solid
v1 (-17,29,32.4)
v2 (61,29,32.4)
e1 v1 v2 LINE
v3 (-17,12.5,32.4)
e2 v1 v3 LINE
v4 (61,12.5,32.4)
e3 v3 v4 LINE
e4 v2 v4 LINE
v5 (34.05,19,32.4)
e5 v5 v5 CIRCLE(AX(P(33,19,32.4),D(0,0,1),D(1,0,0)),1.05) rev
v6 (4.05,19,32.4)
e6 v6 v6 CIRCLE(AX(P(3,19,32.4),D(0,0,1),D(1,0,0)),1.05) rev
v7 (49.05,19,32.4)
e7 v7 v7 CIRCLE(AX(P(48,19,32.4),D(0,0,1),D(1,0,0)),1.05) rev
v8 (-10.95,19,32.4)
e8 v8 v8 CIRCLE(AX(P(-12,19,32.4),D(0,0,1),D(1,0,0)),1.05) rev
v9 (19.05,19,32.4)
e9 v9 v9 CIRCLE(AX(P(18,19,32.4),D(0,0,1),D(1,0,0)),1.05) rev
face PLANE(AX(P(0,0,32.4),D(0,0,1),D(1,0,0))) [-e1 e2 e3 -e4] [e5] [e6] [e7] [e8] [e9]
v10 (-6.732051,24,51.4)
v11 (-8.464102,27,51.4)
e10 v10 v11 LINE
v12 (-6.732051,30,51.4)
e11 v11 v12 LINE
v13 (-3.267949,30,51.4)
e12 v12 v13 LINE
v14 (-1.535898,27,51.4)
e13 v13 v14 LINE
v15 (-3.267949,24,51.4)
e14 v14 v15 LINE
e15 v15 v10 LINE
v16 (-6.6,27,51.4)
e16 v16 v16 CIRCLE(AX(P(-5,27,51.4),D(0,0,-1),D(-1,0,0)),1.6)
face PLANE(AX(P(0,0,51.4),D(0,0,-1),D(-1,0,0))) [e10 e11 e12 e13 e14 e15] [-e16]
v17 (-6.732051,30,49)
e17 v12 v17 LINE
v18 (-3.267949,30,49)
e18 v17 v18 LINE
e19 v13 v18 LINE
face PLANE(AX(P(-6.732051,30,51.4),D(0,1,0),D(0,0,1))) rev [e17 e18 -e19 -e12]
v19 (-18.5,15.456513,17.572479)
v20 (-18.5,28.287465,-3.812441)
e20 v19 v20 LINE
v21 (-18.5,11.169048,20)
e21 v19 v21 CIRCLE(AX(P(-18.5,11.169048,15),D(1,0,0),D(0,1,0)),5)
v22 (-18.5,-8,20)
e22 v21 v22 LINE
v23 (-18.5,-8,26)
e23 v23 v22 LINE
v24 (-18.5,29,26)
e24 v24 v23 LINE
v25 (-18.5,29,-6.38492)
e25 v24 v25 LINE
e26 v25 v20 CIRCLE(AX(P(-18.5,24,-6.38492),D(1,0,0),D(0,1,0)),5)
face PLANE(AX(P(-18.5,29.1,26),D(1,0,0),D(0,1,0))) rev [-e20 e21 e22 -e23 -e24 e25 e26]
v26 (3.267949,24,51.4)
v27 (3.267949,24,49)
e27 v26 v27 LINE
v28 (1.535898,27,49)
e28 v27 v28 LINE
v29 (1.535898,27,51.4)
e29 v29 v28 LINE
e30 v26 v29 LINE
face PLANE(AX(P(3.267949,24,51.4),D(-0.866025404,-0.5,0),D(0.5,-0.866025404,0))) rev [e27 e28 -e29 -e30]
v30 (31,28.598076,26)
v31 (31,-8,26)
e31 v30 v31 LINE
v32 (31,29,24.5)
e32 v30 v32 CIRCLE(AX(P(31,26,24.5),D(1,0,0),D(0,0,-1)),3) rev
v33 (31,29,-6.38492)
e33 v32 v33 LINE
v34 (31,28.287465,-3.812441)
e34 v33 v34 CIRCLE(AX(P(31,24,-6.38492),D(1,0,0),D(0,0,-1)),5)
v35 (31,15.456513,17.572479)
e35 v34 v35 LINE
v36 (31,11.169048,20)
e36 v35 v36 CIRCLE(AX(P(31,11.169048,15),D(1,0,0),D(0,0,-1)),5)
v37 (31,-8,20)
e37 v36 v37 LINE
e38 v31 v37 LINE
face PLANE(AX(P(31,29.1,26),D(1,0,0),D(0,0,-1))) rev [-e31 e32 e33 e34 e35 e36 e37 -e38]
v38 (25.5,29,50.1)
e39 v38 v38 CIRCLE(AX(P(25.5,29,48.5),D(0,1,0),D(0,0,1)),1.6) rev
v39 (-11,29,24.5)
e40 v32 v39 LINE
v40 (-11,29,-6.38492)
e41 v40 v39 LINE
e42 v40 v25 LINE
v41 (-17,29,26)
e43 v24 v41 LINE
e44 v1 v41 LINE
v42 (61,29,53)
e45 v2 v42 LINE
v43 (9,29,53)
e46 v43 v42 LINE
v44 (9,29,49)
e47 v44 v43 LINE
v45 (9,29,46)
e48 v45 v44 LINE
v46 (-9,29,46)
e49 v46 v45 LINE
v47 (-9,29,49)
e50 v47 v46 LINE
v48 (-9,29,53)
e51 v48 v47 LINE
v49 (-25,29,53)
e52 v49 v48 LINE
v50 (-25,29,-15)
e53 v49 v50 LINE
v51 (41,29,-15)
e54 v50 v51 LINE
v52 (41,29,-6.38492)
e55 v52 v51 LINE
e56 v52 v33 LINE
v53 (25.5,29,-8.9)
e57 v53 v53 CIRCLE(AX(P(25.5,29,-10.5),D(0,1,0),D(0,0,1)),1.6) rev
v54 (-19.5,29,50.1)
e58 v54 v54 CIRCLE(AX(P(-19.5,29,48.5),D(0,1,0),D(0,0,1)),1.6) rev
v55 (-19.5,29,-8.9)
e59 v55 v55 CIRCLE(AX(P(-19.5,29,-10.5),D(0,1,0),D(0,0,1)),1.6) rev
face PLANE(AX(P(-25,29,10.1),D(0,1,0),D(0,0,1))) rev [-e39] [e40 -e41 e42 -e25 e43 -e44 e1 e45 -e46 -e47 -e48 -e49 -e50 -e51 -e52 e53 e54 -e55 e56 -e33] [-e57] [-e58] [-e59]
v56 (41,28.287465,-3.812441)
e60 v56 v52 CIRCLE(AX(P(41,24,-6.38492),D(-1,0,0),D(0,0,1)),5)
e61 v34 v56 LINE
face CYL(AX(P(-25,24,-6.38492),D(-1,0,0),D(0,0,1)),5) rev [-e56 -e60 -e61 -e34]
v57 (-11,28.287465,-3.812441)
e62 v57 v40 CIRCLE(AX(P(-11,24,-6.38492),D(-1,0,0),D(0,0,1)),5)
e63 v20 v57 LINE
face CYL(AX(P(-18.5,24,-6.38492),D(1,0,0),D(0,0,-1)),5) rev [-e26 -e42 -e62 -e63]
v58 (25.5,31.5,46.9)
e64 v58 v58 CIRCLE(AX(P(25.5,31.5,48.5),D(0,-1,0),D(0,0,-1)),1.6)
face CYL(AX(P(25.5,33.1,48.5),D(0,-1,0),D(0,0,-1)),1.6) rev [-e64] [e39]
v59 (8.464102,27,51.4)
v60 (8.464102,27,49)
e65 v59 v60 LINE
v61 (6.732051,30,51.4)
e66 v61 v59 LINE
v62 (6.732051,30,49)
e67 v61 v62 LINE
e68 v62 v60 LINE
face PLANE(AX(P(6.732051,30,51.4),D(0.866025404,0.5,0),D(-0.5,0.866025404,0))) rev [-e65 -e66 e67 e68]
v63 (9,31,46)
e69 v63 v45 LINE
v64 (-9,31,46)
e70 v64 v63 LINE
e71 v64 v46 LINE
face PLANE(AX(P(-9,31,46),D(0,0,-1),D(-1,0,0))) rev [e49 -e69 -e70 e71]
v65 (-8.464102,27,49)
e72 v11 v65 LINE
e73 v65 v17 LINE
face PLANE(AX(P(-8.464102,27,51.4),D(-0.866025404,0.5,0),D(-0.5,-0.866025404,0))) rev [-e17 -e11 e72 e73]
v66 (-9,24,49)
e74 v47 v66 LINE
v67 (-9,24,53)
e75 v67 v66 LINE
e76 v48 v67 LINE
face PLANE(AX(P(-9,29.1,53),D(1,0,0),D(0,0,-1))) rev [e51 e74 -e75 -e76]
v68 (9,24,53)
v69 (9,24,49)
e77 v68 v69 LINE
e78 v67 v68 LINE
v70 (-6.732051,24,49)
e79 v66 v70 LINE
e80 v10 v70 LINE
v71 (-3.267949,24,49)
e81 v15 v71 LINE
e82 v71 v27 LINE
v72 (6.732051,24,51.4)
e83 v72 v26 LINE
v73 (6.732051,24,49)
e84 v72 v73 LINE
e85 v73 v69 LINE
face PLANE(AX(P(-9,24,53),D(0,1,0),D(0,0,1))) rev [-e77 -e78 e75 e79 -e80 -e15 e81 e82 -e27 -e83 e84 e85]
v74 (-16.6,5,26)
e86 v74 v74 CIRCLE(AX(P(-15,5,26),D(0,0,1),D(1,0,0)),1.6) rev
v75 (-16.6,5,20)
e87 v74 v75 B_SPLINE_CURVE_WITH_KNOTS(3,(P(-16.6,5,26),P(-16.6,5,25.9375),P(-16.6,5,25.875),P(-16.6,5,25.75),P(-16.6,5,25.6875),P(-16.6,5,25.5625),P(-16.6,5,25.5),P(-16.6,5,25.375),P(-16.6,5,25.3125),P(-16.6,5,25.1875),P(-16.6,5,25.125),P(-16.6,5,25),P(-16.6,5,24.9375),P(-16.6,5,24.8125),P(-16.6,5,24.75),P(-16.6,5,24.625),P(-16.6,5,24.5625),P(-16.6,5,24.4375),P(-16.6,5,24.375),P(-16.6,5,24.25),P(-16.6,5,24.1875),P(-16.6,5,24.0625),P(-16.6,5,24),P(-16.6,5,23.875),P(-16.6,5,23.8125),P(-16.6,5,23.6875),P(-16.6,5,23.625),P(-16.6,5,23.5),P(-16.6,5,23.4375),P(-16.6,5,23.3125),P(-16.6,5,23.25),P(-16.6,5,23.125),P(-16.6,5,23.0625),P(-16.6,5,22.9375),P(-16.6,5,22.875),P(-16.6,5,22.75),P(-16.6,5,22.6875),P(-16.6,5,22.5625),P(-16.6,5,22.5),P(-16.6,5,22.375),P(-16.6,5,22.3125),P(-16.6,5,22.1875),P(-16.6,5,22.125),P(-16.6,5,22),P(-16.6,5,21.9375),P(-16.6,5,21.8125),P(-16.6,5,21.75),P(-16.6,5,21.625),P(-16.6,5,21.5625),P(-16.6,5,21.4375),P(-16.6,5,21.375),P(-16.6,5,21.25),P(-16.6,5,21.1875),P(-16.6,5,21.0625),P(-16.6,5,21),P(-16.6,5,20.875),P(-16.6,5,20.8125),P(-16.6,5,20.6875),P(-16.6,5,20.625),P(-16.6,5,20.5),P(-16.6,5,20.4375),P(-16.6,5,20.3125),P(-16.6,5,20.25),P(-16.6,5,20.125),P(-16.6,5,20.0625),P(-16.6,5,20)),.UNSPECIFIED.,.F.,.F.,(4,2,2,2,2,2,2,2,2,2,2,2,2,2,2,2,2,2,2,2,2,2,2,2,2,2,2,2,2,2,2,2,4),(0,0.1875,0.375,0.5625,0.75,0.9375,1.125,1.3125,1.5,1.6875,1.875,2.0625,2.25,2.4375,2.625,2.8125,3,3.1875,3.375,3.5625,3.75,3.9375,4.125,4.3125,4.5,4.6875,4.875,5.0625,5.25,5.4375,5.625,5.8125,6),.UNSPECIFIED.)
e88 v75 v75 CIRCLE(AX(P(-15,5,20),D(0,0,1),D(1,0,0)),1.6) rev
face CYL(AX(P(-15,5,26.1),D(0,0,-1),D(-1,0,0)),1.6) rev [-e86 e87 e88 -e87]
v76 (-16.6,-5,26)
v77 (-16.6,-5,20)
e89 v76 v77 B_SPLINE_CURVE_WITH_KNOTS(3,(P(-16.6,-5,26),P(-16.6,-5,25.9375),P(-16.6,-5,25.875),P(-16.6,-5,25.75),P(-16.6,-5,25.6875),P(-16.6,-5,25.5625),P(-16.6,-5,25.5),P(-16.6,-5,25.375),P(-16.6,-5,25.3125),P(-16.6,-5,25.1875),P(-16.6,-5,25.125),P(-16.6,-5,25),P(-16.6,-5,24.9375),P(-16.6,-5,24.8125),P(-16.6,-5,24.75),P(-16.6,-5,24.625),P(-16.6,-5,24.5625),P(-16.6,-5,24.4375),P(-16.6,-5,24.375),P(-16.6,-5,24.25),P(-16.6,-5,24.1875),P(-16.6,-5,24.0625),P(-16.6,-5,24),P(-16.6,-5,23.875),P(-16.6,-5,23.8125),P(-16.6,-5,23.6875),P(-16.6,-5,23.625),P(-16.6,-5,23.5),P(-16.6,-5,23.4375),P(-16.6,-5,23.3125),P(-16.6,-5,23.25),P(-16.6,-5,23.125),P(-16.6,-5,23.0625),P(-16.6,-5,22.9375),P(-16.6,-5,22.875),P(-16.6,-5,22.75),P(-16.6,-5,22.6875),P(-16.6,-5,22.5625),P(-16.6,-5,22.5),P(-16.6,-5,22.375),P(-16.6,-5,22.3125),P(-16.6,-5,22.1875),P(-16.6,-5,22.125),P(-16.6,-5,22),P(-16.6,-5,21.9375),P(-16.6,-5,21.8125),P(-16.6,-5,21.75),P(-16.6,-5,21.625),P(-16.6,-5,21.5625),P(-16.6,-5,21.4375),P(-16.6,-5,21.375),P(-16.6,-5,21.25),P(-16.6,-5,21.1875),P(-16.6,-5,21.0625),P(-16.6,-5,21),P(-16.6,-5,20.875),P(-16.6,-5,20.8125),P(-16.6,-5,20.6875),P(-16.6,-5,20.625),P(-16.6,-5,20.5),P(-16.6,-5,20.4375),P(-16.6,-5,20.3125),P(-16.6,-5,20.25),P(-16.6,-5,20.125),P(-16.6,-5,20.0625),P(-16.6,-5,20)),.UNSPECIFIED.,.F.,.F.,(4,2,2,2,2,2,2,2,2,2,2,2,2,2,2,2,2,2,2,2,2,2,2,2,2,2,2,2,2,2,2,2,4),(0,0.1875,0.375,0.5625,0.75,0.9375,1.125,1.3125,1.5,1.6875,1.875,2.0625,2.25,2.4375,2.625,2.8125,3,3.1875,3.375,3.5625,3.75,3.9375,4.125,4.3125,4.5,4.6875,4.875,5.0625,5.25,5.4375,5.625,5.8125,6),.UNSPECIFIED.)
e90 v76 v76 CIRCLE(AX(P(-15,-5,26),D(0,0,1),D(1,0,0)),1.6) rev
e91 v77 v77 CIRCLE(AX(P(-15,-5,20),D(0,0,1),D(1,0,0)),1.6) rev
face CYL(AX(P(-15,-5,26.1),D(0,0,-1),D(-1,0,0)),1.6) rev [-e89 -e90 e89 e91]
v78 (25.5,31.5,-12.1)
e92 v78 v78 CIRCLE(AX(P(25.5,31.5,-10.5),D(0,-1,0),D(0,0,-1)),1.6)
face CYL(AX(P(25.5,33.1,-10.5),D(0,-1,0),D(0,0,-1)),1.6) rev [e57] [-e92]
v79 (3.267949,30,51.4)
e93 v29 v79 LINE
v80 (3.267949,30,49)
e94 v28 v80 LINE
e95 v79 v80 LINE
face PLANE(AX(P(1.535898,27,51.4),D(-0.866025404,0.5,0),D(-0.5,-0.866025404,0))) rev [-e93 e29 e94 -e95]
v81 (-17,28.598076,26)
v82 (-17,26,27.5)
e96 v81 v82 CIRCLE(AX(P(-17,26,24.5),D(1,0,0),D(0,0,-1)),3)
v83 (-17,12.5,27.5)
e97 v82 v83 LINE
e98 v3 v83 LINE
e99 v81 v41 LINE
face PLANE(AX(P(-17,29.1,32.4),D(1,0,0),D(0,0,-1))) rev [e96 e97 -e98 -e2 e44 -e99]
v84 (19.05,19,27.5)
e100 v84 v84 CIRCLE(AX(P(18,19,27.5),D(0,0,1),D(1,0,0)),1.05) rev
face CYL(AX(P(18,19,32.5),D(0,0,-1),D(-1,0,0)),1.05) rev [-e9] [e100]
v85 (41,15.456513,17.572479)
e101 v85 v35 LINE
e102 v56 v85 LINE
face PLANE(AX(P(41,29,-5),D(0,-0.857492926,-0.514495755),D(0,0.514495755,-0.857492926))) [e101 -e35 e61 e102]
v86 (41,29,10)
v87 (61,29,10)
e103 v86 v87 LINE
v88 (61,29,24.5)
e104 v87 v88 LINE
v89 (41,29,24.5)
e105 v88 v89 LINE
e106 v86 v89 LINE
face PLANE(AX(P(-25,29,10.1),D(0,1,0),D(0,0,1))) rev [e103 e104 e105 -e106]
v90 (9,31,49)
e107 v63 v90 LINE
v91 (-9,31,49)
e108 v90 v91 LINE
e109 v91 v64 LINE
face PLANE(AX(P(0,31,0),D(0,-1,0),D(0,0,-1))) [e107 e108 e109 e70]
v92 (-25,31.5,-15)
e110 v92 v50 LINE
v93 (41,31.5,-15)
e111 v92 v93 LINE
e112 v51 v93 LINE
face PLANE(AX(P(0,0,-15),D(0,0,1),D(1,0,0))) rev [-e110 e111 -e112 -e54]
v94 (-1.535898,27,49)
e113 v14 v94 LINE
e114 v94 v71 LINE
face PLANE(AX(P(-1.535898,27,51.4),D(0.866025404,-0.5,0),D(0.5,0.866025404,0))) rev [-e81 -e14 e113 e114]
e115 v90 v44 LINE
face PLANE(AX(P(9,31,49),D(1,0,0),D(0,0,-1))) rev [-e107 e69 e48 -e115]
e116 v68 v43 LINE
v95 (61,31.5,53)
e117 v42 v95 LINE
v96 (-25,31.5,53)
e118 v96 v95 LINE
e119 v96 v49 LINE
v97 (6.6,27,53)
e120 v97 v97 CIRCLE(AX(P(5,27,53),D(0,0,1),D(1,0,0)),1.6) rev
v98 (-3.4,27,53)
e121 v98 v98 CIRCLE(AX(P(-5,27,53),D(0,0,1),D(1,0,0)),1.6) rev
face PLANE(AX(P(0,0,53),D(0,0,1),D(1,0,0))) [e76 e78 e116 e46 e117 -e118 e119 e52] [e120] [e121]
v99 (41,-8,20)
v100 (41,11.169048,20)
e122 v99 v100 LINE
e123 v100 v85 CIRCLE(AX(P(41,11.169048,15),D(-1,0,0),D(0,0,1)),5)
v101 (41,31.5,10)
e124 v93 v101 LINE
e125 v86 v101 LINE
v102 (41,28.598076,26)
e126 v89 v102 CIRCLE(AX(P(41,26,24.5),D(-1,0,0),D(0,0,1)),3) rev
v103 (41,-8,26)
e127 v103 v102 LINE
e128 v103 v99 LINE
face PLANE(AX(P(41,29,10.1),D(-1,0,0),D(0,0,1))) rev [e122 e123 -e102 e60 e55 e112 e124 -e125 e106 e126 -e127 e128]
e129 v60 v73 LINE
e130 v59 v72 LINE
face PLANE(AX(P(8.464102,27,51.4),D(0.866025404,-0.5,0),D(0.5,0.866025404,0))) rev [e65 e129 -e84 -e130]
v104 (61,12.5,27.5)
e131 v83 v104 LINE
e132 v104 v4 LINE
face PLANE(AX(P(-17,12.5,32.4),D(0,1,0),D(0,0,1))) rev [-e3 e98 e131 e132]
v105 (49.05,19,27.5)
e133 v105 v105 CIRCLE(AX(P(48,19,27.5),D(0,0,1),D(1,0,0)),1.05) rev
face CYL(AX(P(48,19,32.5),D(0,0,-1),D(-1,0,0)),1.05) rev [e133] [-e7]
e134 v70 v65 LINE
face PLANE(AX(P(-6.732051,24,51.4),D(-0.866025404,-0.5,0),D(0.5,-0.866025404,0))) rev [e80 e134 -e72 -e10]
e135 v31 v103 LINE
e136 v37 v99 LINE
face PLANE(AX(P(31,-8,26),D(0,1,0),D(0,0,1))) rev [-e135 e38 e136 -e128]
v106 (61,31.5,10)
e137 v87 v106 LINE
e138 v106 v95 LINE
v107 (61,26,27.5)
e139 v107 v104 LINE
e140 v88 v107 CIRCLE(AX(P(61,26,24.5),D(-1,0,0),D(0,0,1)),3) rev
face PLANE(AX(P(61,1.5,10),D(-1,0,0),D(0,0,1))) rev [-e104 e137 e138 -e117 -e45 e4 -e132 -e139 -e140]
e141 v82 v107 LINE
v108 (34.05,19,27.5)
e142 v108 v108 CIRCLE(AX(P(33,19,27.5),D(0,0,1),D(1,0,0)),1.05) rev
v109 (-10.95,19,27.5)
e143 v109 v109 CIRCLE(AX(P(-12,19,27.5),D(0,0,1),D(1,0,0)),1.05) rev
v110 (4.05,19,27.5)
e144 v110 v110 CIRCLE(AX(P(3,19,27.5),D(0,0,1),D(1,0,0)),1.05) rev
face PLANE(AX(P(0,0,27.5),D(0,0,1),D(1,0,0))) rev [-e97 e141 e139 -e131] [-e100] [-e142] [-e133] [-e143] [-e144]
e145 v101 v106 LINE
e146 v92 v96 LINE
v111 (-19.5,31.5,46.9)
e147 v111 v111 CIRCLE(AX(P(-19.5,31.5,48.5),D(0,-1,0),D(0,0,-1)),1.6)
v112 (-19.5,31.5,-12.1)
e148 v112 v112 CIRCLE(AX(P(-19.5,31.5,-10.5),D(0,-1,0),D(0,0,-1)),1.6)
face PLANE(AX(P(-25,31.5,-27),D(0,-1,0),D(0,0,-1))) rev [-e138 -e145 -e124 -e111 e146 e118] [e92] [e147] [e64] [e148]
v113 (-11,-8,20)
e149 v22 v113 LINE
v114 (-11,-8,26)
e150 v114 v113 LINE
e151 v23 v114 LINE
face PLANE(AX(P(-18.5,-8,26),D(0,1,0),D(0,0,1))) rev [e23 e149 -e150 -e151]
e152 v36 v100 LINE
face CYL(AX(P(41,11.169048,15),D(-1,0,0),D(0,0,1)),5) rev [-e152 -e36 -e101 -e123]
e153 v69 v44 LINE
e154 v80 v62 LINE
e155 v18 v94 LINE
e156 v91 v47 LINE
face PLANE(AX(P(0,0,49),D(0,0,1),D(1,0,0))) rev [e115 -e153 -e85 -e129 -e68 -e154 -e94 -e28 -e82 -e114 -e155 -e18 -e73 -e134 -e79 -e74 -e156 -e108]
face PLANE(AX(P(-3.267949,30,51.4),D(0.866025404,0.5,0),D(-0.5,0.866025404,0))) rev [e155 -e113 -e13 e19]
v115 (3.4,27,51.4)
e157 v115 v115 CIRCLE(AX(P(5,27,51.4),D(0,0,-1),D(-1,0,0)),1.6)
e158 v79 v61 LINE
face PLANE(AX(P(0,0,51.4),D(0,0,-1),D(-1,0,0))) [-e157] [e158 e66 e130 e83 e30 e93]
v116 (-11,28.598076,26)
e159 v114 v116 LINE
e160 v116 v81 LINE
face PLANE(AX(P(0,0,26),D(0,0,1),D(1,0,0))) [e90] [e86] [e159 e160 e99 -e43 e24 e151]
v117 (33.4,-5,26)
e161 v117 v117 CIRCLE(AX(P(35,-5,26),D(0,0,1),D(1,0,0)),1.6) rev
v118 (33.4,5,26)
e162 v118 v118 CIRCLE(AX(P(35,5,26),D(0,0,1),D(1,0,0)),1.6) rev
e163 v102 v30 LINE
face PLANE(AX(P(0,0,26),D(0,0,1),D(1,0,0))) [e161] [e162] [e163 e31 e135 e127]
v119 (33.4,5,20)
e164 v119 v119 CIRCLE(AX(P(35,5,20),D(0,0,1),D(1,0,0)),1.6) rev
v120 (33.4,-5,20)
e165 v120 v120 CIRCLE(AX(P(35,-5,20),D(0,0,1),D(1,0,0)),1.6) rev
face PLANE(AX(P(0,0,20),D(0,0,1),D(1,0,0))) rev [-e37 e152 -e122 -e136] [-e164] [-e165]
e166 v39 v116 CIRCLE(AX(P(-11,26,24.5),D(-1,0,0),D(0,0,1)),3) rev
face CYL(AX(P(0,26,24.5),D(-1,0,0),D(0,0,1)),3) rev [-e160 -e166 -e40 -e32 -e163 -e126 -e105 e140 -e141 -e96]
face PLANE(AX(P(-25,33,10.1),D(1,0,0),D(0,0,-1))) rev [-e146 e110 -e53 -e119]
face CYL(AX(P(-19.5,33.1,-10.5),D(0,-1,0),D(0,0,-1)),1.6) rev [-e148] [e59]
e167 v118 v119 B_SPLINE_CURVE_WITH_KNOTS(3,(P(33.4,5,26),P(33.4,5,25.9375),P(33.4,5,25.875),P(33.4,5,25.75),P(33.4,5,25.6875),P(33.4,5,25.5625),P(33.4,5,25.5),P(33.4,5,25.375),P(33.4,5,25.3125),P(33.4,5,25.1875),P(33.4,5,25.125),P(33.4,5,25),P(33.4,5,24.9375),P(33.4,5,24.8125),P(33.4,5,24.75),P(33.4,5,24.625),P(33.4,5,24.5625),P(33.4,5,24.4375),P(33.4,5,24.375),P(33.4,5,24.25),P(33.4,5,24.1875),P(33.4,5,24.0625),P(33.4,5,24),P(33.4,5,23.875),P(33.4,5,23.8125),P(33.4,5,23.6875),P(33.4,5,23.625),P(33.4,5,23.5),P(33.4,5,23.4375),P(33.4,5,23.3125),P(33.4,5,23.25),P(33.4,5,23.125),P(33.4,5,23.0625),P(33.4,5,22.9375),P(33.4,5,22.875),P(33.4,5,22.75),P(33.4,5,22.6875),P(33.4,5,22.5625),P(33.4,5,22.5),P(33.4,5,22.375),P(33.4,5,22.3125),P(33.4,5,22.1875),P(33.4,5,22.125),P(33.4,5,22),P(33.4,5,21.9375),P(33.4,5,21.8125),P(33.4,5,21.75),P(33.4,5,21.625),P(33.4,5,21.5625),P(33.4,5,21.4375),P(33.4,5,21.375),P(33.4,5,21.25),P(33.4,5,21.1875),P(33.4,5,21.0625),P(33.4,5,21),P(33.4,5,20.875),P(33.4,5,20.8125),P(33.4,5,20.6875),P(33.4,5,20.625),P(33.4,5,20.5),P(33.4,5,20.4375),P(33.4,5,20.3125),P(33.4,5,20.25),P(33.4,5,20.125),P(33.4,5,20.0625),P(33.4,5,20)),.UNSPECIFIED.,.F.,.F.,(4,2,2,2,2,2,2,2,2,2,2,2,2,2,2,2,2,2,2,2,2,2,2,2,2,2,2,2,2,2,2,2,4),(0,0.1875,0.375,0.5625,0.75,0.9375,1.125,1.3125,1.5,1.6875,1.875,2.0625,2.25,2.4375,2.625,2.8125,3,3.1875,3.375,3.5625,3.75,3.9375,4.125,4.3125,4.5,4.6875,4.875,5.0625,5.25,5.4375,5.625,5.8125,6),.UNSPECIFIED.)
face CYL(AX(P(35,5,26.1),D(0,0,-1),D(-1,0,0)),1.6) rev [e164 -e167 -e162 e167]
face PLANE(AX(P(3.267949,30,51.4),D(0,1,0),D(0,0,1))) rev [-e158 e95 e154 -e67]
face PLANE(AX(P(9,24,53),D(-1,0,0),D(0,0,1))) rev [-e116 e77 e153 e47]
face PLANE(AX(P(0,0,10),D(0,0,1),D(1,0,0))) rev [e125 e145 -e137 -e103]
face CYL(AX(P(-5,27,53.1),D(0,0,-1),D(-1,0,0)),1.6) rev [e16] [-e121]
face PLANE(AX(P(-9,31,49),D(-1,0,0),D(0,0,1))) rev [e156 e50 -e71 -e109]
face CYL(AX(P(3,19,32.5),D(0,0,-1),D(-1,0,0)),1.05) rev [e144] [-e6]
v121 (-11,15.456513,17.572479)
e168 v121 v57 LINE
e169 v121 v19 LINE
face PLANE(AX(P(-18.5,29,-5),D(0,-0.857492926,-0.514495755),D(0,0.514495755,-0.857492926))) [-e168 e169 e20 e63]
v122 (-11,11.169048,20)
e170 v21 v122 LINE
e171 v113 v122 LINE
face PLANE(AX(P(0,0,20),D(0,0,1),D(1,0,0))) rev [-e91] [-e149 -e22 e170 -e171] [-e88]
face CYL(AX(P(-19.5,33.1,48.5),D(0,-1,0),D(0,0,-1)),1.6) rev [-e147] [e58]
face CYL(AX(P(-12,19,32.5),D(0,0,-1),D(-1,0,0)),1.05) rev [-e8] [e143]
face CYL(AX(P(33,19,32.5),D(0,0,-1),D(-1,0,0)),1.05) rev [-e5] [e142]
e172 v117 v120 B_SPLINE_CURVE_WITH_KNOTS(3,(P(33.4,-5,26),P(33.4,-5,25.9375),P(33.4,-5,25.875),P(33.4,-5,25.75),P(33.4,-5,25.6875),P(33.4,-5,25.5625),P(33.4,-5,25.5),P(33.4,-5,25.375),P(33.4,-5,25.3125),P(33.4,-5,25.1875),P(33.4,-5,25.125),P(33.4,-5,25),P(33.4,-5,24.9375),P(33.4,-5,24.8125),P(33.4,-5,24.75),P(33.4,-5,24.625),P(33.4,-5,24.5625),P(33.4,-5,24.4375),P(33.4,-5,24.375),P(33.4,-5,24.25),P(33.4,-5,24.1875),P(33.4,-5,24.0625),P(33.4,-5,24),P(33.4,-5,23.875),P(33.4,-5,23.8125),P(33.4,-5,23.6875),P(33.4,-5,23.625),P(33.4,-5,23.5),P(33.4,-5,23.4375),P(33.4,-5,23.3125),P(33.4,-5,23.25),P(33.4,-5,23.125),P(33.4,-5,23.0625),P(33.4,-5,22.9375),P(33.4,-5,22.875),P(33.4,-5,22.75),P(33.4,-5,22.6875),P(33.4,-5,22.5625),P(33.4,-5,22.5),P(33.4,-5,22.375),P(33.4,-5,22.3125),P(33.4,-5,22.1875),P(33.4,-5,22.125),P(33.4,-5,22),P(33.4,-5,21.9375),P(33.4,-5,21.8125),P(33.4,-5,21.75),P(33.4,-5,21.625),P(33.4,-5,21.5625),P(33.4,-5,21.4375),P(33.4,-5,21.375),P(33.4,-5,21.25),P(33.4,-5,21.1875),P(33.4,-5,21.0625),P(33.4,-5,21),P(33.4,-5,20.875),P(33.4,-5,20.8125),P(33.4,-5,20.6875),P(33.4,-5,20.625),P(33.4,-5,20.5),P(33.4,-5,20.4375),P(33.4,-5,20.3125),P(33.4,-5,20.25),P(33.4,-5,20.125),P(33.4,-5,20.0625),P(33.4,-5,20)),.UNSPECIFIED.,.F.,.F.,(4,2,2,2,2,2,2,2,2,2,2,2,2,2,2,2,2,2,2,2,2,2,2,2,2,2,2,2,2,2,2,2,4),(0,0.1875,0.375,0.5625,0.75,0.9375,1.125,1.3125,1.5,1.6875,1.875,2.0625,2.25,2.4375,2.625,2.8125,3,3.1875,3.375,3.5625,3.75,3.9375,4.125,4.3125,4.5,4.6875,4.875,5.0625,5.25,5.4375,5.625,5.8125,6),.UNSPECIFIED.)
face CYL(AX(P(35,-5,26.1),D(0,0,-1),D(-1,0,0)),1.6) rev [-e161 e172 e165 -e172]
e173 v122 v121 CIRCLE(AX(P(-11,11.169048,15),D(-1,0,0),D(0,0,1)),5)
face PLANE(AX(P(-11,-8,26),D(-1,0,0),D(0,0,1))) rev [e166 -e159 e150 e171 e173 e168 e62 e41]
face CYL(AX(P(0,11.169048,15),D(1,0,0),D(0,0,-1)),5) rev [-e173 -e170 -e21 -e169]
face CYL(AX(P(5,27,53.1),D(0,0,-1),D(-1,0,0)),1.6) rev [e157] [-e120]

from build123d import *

# Parameters (mm, degrees)
ORTHOGONAL_START                              = -15
ORTHOGONAL_CHASSIS_PLATE_PRIMARY_PROFILE_W    = 66
ORTHOGONAL_CHASSIS_PLATE_PRIMARY_PROFILE_H    = 4
ORTHOGONAL_CHASSIS_PLATE_PRIMARY_DEPTH        = 25.1
ORTHOGONAL_START_2                            = 10
ORTHOGONAL_CHASSIS_PLATE_GUIDE_SIDE_PROF_W    = 109
ORTHOGONAL_CHASSIS_PLATE_GUIDE_SIDE_PROF_H    = 4
ORTHOGONAL_CHASSIS_PLATE_GUIDE_SIDE_DEPTH     = 43
HORIZONTAL_START                              = 20
HORIZONTAL_SERVO_SEAT_UPRIGHTS_PROFILE_W      = 7.5
HORIZONTAL_SERVO_SEAT_UPRIGHTS_PROFILE_H      = 37.1
HORIZONTAL_SERVO_SEAT_UPRIGHTS_PROFILE_W_2    = 10
HORIZONTAL_SERVO_SEAT_UPRIGHTS_DEPTH          = 6
SIDE_START                                    = 27.5
SIDE_MOUNTING_FACE_FOR_MGN7_RAIL_PROFILE_W    = 100
SIDE_MOUNTING_FACE_FOR_MGN7_RAIL_PROFILE_H    = 16.6
SIDE_MOUNTING_FACE_FOR_MGN7_RAIL_DEPTH        = 4.9
HORIZONTAL_START_2                            = 49
HORIZONTAL_LIMIT_BRACKET_FOOT_SUPPORT_PR_W    = 18
HORIZONTAL_LIMIT_BRACKET_FOOT_SUPPORT_PR_H    = 5.1
HORIZONTAL_LIMIT_BRACKET_FOOT_SUPPORT_DEPTH   = 4
CHASSIS_START                                 = 28.9
CHASSIS_MOUNTING_HOLE_LAYOUT_45_X_41_2_R      = 1.6
CHASSIS_MOUNTING_HOLE_LAYOUT_45_X_41_MM_DEPTH = 4.2
SERVO_START                                   = 19.9
SERVO_MOUNT_50_X_10_MM_PITCH_PROFILE_R        = 1.6
SERVO_MOUNT_50_X_10_MM_PITCH_DEPTH            = 6.2
GUIDE_START                                   = 27.45
GUIDE_M2_MOUNTING_PILOTS_15_MM_PITCH_PRO_R    = 1.05
GUIDE_M2_MOUNTING_PILOTS_15_MM_PITCH_DEPTH    = 5.05
STOP_START                                    = 48.9
STOP_MOUNTING_TWO_M3_PILOTS_10_MM_PI_2_R      = 1.6
STOP_MOUNTING_TWO_M3_PILOTS_10_MM_PITCH_DEPTH = 4.2
FILLET_2_R                                    = 3
SKETCH_3_W                                    = 18
SKETCH_3_H                                    = 3
CUT_EXTRUDE_1_DEPTH                           = 2
CUT_EXTRUDE_2_DEPTH                           = 2.4
EXTRUDE_3_DEPTH                               = 7.5
EXTRUDE_4_DEPTH                               = 10
FILLET_3_R                                    = 5
SKETCH_7_W                                    = 109
SKETCH_7_H                                    = 1.5
CUT_EXTRUDE_3_DEPTH                           = 80
SKETCH_8_W                                    = 23
SKETCH_8_H                                    = 43
CUT_EXTRUDE_4_DEPTH                           = 30


with BuildPart() as part:
    # Orthogonal chassis plate primary profile → Orthogonal chassis plate primary (new body)
    with BuildSketch(Plane.XY.offset(ORTHOGONAL_START)):
        with Locations((8, 31)):
            Rectangle(ORTHOGONAL_CHASSIS_PLATE_PRIMARY_PROFILE_W, ORTHOGONAL_CHASSIS_PLATE_PRIMARY_PROFILE_H)
    extrude(amount=ORTHOGONAL_CHASSIS_PLATE_PRIMARY_DEPTH)

    # Orthogonal chassis plate guide side profile → Orthogonal chassis plate guide side (add)
    with BuildSketch(Plane.XY.offset(ORTHOGONAL_START_2)):
        with Locations((29.5, 31)):
            Rectangle(ORTHOGONAL_CHASSIS_PLATE_GUIDE_SIDE_PROF_W, ORTHOGONAL_CHASSIS_PLATE_GUIDE_SIDE_PROF_H)
    extrude(amount=ORTHOGONAL_CHASSIS_PLATE_GUIDE_SIDE_DEPTH)

    # Horizontal servo seat uprights profile → Horizontal servo seat uprights (add)
    with BuildSketch(Plane.XY.offset(HORIZONTAL_START)):
        with Locations((-14.75, 10.55)):
            Rectangle(HORIZONTAL_SERVO_SEAT_UPRIGHTS_PROFILE_W, HORIZONTAL_SERVO_SEAT_UPRIGHTS_PROFILE_H)
        with Locations((36, 10.55)):
            Rectangle(HORIZONTAL_SERVO_SEAT_UPRIGHTS_PROFILE_W_2, HORIZONTAL_SERVO_SEAT_UPRIGHTS_PROFILE_H)
    extrude(amount=HORIZONTAL_SERVO_SEAT_UPRIGHTS_DEPTH)

    # Side mounting face for MGN7 rail profile → Side mounting face for MGN7 rail (add)
    with BuildSketch(Plane.XY.offset(SIDE_START)):
        with Locations((33, 20.8)):
            Rectangle(SIDE_MOUNTING_FACE_FOR_MGN7_RAIL_PROFILE_W, SIDE_MOUNTING_FACE_FOR_MGN7_RAIL_PROFILE_H)
    extrude(amount=SIDE_MOUNTING_FACE_FOR_MGN7_RAIL_DEPTH)

    # Horizontal limit bracket foot support profile → Horizontal limit bracket foot support (add)
    with BuildSketch(Plane.XY.offset(HORIZONTAL_START_2)):
        with Locations((0, 26.55)):
            Rectangle(HORIZONTAL_LIMIT_BRACKET_FOOT_SUPPORT_PR_W, HORIZONTAL_LIMIT_BRACKET_FOOT_SUPPORT_PR_H)
    extrude(amount=HORIZONTAL_LIMIT_BRACKET_FOOT_SUPPORT_DEPTH)

    # Chassis mounting hole layout 45 x 41 2 → Chassis mounting hole layout 45 x 41 mm (cut)
    with BuildSketch(Plane(origin=(0, 0, 0), x_dir=(1, 0, 0), z_dir=(0, 1, 0)).offset(CHASSIS_START)):
        with Locations(Location((-19.5, 10.5, 0), (0, 0, 90))):
            Circle(CHASSIS_MOUNTING_HOLE_LAYOUT_45_X_41_2_R)
        with Locations(Location((-19.5, -48.5, 0), (0, 0, 90))):
            Circle(CHASSIS_MOUNTING_HOLE_LAYOUT_45_X_41_2_R)
        with Locations(Location((25.5, 10.5, 0), (0, 0, 90))):
            Circle(CHASSIS_MOUNTING_HOLE_LAYOUT_45_X_41_2_R)
        with Locations(Location((25.5, -48.5, 0), (0, 0, 90))):
            Circle(CHASSIS_MOUNTING_HOLE_LAYOUT_45_X_41_2_R)
        with Locations(Location((70.5, -48.5, 0), (0, 0, 90))):
            Circle(CHASSIS_MOUNTING_HOLE_LAYOUT_45_X_41_2_R)
    extrude(amount=CHASSIS_MOUNTING_HOLE_LAYOUT_45_X_41_MM_DEPTH, mode=Mode.SUBTRACT)

    # Servo mount 50 x 10 mm pitch profile → Servo mount 50 x 10 mm pitch (cut)
    with BuildSketch(Plane.XY.offset(SERVO_START)):
        with Locations(Location((-15, -5, 0), (0, 0, 180))):
            Circle(SERVO_MOUNT_50_X_10_MM_PITCH_PROFILE_R)
        with Locations(Location((-15, 5, 0), (0, 0, 180))):
            Circle(SERVO_MOUNT_50_X_10_MM_PITCH_PROFILE_R)
        with Locations(Location((35, -5, 0), (0, 0, 180))):
            Circle(SERVO_MOUNT_50_X_10_MM_PITCH_PROFILE_R)
        with Locations(Location((35, 5, 0), (0, 0, 180))):
            Circle(SERVO_MOUNT_50_X_10_MM_PITCH_PROFILE_R)
    extrude(amount=SERVO_MOUNT_50_X_10_MM_PITCH_DEPTH, mode=Mode.SUBTRACT)

    # Guide M2 mounting pilots 15 mm pitch profile → Guide M2 mounting pilots 15 mm pitch (cut)
    with BuildSketch(Plane.XY.offset(GUIDE_START)):
        with Locations((-12, 19)):
            Circle(GUIDE_M2_MOUNTING_PILOTS_15_MM_PITCH_PRO_R)
        with Locations((3, 19)):
            Circle(GUIDE_M2_MOUNTING_PILOTS_15_MM_PITCH_PRO_R)
        with Locations((18, 19)):
            Circle(GUIDE_M2_MOUNTING_PILOTS_15_MM_PITCH_PRO_R)
        with Locations((33, 19)):
            Circle(GUIDE_M2_MOUNTING_PILOTS_15_MM_PITCH_PRO_R)
        with Locations((48, 19)):
            Circle(GUIDE_M2_MOUNTING_PILOTS_15_MM_PITCH_PRO_R)
        with Locations((63, 19)):
            Circle(GUIDE_M2_MOUNTING_PILOTS_15_MM_PITCH_PRO_R)
        with Locations((78, 19)):
            Circle(GUIDE_M2_MOUNTING_PILOTS_15_MM_PITCH_PRO_R)
    extrude(amount=GUIDE_M2_MOUNTING_PILOTS_15_MM_PITCH_DEPTH, mode=Mode.SUBTRACT)

    # Stop mounting two M3 pilots 10 mm pi 2 → Stop mounting two M3 pilots 10 mm pitch (cut)
    with BuildSketch(Plane.XY.offset(STOP_START)):
        with Locations((-5, 27)):
            Circle(STOP_MOUNTING_TWO_M3_PILOTS_10_MM_PI_2_R)
        with Locations((5, 27)):
            Circle(STOP_MOUNTING_TWO_M3_PILOTS_10_MM_PI_2_R)
    extrude(amount=STOP_MOUNTING_TWO_M3_PILOTS_10_MM_PITCH_DEPTH, mode=Mode.SUBTRACT)

    # 圆角2
    # the kernel refuses this fillet: 3 mm, written as the material it adds along each edge
    with BuildSketch(Plane(origin=(-17, 29, 27.5), x_dir=(0, 0, -1), z_dir=(1, 0, 0))) as fillet_2_piece_1:
        with BuildLine():
            CenterArc((FILLET_2_R, -FILLET_2_R), FILLET_2_R, 90, 90)
            Line((0, -FILLET_2_R), (0, 0))
            Line((0, 0), (FILLET_2_R, 0))
        make_face()
    extrude(amount=100)

    # 草图3 → 切除-拉伸1 (cut)
    with BuildSketch(Plane(origin=(0, 29, 0), x_dir=(-1, 0, 0), z_dir=(0, -1, 0))):
        with Locations((0, -47.5)):
            Rectangle(SKETCH_3_W, SKETCH_3_H)
    extrude(amount=-CUT_EXTRUDE_1_DEPTH, mode=Mode.SUBTRACT)

    # 草图4 → 切除-拉伸2 (cut)
    with BuildSketch(Plane(origin=(0, 0, 49), x_dir=(-1, 0, 0), z_dir=(0, 0, -1))):
        Polygon((-3.267949192, 30), (-6.732050808, 30), (-8.464101615, 27), (-6.732050808, 24), (-3.267949192, 24), (-1.535898385, 27), align=None)
        Polygon((6.732050808, 30), (3.267949192, 30), (1.535898385, 27), (3.267949192, 24), (6.732050808, 24), (8.464101615, 27), align=None)
    extrude(amount=-CUT_EXTRUDE_2_DEPTH, mode=Mode.SUBTRACT)

    # 草图5 → 凸台-拉伸3 (add)
    with BuildSketch(Plane(origin=(-11, 0, 0), x_dir=(0, 0, -1), z_dir=(1, 0, 0))):
        Polygon((-20, 29), (5, 29), (-20, 14), align=None)
    extrude(amount=-EXTRUDE_3_DEPTH)

    # 草图6 → 凸台-拉伸4 (add)
    with BuildSketch(Plane.ZY.offset(-31)):
        Polygon((20, 29), (-5, 29), (20, 14), align=None)
    extrude(amount=-EXTRUDE_4_DEPTH)

    # 圆角3
    fillet_3_edges = [part.edges().sort_by_distance(p)[0] for p in [
        (-14.75, 14, 20),
        (-14.75, 29, -5),
        (36, 14, 20),
        (36, 29, -5),
    ]]
    fillet(fillet_3_edges, radius=FILLET_3_R)

    # 草图7 → 切除-拉伸3 (cut)
    with BuildSketch(Plane.XY.offset(53)):
        with Locations((29.5, 32.25)):
            Rectangle(SKETCH_7_W, SKETCH_7_H)
    extrude(amount=-CUT_EXTRUDE_3_DEPTH, mode=Mode.SUBTRACT)

    # 草图8 → 切除-拉伸4 (cut)
    with BuildSketch(Plane(origin=(0, 31.5, 0), x_dir=(1, 0, 0), z_dir=(0, 1, 0))):
        with Locations((72.5, -31.5)):
            Rectangle(SKETCH_8_W, SKETCH_8_H)
    extrude(amount=-CUT_EXTRUDE_4_DEPTH, mode=Mode.SUBTRACT)


solid = part.part
